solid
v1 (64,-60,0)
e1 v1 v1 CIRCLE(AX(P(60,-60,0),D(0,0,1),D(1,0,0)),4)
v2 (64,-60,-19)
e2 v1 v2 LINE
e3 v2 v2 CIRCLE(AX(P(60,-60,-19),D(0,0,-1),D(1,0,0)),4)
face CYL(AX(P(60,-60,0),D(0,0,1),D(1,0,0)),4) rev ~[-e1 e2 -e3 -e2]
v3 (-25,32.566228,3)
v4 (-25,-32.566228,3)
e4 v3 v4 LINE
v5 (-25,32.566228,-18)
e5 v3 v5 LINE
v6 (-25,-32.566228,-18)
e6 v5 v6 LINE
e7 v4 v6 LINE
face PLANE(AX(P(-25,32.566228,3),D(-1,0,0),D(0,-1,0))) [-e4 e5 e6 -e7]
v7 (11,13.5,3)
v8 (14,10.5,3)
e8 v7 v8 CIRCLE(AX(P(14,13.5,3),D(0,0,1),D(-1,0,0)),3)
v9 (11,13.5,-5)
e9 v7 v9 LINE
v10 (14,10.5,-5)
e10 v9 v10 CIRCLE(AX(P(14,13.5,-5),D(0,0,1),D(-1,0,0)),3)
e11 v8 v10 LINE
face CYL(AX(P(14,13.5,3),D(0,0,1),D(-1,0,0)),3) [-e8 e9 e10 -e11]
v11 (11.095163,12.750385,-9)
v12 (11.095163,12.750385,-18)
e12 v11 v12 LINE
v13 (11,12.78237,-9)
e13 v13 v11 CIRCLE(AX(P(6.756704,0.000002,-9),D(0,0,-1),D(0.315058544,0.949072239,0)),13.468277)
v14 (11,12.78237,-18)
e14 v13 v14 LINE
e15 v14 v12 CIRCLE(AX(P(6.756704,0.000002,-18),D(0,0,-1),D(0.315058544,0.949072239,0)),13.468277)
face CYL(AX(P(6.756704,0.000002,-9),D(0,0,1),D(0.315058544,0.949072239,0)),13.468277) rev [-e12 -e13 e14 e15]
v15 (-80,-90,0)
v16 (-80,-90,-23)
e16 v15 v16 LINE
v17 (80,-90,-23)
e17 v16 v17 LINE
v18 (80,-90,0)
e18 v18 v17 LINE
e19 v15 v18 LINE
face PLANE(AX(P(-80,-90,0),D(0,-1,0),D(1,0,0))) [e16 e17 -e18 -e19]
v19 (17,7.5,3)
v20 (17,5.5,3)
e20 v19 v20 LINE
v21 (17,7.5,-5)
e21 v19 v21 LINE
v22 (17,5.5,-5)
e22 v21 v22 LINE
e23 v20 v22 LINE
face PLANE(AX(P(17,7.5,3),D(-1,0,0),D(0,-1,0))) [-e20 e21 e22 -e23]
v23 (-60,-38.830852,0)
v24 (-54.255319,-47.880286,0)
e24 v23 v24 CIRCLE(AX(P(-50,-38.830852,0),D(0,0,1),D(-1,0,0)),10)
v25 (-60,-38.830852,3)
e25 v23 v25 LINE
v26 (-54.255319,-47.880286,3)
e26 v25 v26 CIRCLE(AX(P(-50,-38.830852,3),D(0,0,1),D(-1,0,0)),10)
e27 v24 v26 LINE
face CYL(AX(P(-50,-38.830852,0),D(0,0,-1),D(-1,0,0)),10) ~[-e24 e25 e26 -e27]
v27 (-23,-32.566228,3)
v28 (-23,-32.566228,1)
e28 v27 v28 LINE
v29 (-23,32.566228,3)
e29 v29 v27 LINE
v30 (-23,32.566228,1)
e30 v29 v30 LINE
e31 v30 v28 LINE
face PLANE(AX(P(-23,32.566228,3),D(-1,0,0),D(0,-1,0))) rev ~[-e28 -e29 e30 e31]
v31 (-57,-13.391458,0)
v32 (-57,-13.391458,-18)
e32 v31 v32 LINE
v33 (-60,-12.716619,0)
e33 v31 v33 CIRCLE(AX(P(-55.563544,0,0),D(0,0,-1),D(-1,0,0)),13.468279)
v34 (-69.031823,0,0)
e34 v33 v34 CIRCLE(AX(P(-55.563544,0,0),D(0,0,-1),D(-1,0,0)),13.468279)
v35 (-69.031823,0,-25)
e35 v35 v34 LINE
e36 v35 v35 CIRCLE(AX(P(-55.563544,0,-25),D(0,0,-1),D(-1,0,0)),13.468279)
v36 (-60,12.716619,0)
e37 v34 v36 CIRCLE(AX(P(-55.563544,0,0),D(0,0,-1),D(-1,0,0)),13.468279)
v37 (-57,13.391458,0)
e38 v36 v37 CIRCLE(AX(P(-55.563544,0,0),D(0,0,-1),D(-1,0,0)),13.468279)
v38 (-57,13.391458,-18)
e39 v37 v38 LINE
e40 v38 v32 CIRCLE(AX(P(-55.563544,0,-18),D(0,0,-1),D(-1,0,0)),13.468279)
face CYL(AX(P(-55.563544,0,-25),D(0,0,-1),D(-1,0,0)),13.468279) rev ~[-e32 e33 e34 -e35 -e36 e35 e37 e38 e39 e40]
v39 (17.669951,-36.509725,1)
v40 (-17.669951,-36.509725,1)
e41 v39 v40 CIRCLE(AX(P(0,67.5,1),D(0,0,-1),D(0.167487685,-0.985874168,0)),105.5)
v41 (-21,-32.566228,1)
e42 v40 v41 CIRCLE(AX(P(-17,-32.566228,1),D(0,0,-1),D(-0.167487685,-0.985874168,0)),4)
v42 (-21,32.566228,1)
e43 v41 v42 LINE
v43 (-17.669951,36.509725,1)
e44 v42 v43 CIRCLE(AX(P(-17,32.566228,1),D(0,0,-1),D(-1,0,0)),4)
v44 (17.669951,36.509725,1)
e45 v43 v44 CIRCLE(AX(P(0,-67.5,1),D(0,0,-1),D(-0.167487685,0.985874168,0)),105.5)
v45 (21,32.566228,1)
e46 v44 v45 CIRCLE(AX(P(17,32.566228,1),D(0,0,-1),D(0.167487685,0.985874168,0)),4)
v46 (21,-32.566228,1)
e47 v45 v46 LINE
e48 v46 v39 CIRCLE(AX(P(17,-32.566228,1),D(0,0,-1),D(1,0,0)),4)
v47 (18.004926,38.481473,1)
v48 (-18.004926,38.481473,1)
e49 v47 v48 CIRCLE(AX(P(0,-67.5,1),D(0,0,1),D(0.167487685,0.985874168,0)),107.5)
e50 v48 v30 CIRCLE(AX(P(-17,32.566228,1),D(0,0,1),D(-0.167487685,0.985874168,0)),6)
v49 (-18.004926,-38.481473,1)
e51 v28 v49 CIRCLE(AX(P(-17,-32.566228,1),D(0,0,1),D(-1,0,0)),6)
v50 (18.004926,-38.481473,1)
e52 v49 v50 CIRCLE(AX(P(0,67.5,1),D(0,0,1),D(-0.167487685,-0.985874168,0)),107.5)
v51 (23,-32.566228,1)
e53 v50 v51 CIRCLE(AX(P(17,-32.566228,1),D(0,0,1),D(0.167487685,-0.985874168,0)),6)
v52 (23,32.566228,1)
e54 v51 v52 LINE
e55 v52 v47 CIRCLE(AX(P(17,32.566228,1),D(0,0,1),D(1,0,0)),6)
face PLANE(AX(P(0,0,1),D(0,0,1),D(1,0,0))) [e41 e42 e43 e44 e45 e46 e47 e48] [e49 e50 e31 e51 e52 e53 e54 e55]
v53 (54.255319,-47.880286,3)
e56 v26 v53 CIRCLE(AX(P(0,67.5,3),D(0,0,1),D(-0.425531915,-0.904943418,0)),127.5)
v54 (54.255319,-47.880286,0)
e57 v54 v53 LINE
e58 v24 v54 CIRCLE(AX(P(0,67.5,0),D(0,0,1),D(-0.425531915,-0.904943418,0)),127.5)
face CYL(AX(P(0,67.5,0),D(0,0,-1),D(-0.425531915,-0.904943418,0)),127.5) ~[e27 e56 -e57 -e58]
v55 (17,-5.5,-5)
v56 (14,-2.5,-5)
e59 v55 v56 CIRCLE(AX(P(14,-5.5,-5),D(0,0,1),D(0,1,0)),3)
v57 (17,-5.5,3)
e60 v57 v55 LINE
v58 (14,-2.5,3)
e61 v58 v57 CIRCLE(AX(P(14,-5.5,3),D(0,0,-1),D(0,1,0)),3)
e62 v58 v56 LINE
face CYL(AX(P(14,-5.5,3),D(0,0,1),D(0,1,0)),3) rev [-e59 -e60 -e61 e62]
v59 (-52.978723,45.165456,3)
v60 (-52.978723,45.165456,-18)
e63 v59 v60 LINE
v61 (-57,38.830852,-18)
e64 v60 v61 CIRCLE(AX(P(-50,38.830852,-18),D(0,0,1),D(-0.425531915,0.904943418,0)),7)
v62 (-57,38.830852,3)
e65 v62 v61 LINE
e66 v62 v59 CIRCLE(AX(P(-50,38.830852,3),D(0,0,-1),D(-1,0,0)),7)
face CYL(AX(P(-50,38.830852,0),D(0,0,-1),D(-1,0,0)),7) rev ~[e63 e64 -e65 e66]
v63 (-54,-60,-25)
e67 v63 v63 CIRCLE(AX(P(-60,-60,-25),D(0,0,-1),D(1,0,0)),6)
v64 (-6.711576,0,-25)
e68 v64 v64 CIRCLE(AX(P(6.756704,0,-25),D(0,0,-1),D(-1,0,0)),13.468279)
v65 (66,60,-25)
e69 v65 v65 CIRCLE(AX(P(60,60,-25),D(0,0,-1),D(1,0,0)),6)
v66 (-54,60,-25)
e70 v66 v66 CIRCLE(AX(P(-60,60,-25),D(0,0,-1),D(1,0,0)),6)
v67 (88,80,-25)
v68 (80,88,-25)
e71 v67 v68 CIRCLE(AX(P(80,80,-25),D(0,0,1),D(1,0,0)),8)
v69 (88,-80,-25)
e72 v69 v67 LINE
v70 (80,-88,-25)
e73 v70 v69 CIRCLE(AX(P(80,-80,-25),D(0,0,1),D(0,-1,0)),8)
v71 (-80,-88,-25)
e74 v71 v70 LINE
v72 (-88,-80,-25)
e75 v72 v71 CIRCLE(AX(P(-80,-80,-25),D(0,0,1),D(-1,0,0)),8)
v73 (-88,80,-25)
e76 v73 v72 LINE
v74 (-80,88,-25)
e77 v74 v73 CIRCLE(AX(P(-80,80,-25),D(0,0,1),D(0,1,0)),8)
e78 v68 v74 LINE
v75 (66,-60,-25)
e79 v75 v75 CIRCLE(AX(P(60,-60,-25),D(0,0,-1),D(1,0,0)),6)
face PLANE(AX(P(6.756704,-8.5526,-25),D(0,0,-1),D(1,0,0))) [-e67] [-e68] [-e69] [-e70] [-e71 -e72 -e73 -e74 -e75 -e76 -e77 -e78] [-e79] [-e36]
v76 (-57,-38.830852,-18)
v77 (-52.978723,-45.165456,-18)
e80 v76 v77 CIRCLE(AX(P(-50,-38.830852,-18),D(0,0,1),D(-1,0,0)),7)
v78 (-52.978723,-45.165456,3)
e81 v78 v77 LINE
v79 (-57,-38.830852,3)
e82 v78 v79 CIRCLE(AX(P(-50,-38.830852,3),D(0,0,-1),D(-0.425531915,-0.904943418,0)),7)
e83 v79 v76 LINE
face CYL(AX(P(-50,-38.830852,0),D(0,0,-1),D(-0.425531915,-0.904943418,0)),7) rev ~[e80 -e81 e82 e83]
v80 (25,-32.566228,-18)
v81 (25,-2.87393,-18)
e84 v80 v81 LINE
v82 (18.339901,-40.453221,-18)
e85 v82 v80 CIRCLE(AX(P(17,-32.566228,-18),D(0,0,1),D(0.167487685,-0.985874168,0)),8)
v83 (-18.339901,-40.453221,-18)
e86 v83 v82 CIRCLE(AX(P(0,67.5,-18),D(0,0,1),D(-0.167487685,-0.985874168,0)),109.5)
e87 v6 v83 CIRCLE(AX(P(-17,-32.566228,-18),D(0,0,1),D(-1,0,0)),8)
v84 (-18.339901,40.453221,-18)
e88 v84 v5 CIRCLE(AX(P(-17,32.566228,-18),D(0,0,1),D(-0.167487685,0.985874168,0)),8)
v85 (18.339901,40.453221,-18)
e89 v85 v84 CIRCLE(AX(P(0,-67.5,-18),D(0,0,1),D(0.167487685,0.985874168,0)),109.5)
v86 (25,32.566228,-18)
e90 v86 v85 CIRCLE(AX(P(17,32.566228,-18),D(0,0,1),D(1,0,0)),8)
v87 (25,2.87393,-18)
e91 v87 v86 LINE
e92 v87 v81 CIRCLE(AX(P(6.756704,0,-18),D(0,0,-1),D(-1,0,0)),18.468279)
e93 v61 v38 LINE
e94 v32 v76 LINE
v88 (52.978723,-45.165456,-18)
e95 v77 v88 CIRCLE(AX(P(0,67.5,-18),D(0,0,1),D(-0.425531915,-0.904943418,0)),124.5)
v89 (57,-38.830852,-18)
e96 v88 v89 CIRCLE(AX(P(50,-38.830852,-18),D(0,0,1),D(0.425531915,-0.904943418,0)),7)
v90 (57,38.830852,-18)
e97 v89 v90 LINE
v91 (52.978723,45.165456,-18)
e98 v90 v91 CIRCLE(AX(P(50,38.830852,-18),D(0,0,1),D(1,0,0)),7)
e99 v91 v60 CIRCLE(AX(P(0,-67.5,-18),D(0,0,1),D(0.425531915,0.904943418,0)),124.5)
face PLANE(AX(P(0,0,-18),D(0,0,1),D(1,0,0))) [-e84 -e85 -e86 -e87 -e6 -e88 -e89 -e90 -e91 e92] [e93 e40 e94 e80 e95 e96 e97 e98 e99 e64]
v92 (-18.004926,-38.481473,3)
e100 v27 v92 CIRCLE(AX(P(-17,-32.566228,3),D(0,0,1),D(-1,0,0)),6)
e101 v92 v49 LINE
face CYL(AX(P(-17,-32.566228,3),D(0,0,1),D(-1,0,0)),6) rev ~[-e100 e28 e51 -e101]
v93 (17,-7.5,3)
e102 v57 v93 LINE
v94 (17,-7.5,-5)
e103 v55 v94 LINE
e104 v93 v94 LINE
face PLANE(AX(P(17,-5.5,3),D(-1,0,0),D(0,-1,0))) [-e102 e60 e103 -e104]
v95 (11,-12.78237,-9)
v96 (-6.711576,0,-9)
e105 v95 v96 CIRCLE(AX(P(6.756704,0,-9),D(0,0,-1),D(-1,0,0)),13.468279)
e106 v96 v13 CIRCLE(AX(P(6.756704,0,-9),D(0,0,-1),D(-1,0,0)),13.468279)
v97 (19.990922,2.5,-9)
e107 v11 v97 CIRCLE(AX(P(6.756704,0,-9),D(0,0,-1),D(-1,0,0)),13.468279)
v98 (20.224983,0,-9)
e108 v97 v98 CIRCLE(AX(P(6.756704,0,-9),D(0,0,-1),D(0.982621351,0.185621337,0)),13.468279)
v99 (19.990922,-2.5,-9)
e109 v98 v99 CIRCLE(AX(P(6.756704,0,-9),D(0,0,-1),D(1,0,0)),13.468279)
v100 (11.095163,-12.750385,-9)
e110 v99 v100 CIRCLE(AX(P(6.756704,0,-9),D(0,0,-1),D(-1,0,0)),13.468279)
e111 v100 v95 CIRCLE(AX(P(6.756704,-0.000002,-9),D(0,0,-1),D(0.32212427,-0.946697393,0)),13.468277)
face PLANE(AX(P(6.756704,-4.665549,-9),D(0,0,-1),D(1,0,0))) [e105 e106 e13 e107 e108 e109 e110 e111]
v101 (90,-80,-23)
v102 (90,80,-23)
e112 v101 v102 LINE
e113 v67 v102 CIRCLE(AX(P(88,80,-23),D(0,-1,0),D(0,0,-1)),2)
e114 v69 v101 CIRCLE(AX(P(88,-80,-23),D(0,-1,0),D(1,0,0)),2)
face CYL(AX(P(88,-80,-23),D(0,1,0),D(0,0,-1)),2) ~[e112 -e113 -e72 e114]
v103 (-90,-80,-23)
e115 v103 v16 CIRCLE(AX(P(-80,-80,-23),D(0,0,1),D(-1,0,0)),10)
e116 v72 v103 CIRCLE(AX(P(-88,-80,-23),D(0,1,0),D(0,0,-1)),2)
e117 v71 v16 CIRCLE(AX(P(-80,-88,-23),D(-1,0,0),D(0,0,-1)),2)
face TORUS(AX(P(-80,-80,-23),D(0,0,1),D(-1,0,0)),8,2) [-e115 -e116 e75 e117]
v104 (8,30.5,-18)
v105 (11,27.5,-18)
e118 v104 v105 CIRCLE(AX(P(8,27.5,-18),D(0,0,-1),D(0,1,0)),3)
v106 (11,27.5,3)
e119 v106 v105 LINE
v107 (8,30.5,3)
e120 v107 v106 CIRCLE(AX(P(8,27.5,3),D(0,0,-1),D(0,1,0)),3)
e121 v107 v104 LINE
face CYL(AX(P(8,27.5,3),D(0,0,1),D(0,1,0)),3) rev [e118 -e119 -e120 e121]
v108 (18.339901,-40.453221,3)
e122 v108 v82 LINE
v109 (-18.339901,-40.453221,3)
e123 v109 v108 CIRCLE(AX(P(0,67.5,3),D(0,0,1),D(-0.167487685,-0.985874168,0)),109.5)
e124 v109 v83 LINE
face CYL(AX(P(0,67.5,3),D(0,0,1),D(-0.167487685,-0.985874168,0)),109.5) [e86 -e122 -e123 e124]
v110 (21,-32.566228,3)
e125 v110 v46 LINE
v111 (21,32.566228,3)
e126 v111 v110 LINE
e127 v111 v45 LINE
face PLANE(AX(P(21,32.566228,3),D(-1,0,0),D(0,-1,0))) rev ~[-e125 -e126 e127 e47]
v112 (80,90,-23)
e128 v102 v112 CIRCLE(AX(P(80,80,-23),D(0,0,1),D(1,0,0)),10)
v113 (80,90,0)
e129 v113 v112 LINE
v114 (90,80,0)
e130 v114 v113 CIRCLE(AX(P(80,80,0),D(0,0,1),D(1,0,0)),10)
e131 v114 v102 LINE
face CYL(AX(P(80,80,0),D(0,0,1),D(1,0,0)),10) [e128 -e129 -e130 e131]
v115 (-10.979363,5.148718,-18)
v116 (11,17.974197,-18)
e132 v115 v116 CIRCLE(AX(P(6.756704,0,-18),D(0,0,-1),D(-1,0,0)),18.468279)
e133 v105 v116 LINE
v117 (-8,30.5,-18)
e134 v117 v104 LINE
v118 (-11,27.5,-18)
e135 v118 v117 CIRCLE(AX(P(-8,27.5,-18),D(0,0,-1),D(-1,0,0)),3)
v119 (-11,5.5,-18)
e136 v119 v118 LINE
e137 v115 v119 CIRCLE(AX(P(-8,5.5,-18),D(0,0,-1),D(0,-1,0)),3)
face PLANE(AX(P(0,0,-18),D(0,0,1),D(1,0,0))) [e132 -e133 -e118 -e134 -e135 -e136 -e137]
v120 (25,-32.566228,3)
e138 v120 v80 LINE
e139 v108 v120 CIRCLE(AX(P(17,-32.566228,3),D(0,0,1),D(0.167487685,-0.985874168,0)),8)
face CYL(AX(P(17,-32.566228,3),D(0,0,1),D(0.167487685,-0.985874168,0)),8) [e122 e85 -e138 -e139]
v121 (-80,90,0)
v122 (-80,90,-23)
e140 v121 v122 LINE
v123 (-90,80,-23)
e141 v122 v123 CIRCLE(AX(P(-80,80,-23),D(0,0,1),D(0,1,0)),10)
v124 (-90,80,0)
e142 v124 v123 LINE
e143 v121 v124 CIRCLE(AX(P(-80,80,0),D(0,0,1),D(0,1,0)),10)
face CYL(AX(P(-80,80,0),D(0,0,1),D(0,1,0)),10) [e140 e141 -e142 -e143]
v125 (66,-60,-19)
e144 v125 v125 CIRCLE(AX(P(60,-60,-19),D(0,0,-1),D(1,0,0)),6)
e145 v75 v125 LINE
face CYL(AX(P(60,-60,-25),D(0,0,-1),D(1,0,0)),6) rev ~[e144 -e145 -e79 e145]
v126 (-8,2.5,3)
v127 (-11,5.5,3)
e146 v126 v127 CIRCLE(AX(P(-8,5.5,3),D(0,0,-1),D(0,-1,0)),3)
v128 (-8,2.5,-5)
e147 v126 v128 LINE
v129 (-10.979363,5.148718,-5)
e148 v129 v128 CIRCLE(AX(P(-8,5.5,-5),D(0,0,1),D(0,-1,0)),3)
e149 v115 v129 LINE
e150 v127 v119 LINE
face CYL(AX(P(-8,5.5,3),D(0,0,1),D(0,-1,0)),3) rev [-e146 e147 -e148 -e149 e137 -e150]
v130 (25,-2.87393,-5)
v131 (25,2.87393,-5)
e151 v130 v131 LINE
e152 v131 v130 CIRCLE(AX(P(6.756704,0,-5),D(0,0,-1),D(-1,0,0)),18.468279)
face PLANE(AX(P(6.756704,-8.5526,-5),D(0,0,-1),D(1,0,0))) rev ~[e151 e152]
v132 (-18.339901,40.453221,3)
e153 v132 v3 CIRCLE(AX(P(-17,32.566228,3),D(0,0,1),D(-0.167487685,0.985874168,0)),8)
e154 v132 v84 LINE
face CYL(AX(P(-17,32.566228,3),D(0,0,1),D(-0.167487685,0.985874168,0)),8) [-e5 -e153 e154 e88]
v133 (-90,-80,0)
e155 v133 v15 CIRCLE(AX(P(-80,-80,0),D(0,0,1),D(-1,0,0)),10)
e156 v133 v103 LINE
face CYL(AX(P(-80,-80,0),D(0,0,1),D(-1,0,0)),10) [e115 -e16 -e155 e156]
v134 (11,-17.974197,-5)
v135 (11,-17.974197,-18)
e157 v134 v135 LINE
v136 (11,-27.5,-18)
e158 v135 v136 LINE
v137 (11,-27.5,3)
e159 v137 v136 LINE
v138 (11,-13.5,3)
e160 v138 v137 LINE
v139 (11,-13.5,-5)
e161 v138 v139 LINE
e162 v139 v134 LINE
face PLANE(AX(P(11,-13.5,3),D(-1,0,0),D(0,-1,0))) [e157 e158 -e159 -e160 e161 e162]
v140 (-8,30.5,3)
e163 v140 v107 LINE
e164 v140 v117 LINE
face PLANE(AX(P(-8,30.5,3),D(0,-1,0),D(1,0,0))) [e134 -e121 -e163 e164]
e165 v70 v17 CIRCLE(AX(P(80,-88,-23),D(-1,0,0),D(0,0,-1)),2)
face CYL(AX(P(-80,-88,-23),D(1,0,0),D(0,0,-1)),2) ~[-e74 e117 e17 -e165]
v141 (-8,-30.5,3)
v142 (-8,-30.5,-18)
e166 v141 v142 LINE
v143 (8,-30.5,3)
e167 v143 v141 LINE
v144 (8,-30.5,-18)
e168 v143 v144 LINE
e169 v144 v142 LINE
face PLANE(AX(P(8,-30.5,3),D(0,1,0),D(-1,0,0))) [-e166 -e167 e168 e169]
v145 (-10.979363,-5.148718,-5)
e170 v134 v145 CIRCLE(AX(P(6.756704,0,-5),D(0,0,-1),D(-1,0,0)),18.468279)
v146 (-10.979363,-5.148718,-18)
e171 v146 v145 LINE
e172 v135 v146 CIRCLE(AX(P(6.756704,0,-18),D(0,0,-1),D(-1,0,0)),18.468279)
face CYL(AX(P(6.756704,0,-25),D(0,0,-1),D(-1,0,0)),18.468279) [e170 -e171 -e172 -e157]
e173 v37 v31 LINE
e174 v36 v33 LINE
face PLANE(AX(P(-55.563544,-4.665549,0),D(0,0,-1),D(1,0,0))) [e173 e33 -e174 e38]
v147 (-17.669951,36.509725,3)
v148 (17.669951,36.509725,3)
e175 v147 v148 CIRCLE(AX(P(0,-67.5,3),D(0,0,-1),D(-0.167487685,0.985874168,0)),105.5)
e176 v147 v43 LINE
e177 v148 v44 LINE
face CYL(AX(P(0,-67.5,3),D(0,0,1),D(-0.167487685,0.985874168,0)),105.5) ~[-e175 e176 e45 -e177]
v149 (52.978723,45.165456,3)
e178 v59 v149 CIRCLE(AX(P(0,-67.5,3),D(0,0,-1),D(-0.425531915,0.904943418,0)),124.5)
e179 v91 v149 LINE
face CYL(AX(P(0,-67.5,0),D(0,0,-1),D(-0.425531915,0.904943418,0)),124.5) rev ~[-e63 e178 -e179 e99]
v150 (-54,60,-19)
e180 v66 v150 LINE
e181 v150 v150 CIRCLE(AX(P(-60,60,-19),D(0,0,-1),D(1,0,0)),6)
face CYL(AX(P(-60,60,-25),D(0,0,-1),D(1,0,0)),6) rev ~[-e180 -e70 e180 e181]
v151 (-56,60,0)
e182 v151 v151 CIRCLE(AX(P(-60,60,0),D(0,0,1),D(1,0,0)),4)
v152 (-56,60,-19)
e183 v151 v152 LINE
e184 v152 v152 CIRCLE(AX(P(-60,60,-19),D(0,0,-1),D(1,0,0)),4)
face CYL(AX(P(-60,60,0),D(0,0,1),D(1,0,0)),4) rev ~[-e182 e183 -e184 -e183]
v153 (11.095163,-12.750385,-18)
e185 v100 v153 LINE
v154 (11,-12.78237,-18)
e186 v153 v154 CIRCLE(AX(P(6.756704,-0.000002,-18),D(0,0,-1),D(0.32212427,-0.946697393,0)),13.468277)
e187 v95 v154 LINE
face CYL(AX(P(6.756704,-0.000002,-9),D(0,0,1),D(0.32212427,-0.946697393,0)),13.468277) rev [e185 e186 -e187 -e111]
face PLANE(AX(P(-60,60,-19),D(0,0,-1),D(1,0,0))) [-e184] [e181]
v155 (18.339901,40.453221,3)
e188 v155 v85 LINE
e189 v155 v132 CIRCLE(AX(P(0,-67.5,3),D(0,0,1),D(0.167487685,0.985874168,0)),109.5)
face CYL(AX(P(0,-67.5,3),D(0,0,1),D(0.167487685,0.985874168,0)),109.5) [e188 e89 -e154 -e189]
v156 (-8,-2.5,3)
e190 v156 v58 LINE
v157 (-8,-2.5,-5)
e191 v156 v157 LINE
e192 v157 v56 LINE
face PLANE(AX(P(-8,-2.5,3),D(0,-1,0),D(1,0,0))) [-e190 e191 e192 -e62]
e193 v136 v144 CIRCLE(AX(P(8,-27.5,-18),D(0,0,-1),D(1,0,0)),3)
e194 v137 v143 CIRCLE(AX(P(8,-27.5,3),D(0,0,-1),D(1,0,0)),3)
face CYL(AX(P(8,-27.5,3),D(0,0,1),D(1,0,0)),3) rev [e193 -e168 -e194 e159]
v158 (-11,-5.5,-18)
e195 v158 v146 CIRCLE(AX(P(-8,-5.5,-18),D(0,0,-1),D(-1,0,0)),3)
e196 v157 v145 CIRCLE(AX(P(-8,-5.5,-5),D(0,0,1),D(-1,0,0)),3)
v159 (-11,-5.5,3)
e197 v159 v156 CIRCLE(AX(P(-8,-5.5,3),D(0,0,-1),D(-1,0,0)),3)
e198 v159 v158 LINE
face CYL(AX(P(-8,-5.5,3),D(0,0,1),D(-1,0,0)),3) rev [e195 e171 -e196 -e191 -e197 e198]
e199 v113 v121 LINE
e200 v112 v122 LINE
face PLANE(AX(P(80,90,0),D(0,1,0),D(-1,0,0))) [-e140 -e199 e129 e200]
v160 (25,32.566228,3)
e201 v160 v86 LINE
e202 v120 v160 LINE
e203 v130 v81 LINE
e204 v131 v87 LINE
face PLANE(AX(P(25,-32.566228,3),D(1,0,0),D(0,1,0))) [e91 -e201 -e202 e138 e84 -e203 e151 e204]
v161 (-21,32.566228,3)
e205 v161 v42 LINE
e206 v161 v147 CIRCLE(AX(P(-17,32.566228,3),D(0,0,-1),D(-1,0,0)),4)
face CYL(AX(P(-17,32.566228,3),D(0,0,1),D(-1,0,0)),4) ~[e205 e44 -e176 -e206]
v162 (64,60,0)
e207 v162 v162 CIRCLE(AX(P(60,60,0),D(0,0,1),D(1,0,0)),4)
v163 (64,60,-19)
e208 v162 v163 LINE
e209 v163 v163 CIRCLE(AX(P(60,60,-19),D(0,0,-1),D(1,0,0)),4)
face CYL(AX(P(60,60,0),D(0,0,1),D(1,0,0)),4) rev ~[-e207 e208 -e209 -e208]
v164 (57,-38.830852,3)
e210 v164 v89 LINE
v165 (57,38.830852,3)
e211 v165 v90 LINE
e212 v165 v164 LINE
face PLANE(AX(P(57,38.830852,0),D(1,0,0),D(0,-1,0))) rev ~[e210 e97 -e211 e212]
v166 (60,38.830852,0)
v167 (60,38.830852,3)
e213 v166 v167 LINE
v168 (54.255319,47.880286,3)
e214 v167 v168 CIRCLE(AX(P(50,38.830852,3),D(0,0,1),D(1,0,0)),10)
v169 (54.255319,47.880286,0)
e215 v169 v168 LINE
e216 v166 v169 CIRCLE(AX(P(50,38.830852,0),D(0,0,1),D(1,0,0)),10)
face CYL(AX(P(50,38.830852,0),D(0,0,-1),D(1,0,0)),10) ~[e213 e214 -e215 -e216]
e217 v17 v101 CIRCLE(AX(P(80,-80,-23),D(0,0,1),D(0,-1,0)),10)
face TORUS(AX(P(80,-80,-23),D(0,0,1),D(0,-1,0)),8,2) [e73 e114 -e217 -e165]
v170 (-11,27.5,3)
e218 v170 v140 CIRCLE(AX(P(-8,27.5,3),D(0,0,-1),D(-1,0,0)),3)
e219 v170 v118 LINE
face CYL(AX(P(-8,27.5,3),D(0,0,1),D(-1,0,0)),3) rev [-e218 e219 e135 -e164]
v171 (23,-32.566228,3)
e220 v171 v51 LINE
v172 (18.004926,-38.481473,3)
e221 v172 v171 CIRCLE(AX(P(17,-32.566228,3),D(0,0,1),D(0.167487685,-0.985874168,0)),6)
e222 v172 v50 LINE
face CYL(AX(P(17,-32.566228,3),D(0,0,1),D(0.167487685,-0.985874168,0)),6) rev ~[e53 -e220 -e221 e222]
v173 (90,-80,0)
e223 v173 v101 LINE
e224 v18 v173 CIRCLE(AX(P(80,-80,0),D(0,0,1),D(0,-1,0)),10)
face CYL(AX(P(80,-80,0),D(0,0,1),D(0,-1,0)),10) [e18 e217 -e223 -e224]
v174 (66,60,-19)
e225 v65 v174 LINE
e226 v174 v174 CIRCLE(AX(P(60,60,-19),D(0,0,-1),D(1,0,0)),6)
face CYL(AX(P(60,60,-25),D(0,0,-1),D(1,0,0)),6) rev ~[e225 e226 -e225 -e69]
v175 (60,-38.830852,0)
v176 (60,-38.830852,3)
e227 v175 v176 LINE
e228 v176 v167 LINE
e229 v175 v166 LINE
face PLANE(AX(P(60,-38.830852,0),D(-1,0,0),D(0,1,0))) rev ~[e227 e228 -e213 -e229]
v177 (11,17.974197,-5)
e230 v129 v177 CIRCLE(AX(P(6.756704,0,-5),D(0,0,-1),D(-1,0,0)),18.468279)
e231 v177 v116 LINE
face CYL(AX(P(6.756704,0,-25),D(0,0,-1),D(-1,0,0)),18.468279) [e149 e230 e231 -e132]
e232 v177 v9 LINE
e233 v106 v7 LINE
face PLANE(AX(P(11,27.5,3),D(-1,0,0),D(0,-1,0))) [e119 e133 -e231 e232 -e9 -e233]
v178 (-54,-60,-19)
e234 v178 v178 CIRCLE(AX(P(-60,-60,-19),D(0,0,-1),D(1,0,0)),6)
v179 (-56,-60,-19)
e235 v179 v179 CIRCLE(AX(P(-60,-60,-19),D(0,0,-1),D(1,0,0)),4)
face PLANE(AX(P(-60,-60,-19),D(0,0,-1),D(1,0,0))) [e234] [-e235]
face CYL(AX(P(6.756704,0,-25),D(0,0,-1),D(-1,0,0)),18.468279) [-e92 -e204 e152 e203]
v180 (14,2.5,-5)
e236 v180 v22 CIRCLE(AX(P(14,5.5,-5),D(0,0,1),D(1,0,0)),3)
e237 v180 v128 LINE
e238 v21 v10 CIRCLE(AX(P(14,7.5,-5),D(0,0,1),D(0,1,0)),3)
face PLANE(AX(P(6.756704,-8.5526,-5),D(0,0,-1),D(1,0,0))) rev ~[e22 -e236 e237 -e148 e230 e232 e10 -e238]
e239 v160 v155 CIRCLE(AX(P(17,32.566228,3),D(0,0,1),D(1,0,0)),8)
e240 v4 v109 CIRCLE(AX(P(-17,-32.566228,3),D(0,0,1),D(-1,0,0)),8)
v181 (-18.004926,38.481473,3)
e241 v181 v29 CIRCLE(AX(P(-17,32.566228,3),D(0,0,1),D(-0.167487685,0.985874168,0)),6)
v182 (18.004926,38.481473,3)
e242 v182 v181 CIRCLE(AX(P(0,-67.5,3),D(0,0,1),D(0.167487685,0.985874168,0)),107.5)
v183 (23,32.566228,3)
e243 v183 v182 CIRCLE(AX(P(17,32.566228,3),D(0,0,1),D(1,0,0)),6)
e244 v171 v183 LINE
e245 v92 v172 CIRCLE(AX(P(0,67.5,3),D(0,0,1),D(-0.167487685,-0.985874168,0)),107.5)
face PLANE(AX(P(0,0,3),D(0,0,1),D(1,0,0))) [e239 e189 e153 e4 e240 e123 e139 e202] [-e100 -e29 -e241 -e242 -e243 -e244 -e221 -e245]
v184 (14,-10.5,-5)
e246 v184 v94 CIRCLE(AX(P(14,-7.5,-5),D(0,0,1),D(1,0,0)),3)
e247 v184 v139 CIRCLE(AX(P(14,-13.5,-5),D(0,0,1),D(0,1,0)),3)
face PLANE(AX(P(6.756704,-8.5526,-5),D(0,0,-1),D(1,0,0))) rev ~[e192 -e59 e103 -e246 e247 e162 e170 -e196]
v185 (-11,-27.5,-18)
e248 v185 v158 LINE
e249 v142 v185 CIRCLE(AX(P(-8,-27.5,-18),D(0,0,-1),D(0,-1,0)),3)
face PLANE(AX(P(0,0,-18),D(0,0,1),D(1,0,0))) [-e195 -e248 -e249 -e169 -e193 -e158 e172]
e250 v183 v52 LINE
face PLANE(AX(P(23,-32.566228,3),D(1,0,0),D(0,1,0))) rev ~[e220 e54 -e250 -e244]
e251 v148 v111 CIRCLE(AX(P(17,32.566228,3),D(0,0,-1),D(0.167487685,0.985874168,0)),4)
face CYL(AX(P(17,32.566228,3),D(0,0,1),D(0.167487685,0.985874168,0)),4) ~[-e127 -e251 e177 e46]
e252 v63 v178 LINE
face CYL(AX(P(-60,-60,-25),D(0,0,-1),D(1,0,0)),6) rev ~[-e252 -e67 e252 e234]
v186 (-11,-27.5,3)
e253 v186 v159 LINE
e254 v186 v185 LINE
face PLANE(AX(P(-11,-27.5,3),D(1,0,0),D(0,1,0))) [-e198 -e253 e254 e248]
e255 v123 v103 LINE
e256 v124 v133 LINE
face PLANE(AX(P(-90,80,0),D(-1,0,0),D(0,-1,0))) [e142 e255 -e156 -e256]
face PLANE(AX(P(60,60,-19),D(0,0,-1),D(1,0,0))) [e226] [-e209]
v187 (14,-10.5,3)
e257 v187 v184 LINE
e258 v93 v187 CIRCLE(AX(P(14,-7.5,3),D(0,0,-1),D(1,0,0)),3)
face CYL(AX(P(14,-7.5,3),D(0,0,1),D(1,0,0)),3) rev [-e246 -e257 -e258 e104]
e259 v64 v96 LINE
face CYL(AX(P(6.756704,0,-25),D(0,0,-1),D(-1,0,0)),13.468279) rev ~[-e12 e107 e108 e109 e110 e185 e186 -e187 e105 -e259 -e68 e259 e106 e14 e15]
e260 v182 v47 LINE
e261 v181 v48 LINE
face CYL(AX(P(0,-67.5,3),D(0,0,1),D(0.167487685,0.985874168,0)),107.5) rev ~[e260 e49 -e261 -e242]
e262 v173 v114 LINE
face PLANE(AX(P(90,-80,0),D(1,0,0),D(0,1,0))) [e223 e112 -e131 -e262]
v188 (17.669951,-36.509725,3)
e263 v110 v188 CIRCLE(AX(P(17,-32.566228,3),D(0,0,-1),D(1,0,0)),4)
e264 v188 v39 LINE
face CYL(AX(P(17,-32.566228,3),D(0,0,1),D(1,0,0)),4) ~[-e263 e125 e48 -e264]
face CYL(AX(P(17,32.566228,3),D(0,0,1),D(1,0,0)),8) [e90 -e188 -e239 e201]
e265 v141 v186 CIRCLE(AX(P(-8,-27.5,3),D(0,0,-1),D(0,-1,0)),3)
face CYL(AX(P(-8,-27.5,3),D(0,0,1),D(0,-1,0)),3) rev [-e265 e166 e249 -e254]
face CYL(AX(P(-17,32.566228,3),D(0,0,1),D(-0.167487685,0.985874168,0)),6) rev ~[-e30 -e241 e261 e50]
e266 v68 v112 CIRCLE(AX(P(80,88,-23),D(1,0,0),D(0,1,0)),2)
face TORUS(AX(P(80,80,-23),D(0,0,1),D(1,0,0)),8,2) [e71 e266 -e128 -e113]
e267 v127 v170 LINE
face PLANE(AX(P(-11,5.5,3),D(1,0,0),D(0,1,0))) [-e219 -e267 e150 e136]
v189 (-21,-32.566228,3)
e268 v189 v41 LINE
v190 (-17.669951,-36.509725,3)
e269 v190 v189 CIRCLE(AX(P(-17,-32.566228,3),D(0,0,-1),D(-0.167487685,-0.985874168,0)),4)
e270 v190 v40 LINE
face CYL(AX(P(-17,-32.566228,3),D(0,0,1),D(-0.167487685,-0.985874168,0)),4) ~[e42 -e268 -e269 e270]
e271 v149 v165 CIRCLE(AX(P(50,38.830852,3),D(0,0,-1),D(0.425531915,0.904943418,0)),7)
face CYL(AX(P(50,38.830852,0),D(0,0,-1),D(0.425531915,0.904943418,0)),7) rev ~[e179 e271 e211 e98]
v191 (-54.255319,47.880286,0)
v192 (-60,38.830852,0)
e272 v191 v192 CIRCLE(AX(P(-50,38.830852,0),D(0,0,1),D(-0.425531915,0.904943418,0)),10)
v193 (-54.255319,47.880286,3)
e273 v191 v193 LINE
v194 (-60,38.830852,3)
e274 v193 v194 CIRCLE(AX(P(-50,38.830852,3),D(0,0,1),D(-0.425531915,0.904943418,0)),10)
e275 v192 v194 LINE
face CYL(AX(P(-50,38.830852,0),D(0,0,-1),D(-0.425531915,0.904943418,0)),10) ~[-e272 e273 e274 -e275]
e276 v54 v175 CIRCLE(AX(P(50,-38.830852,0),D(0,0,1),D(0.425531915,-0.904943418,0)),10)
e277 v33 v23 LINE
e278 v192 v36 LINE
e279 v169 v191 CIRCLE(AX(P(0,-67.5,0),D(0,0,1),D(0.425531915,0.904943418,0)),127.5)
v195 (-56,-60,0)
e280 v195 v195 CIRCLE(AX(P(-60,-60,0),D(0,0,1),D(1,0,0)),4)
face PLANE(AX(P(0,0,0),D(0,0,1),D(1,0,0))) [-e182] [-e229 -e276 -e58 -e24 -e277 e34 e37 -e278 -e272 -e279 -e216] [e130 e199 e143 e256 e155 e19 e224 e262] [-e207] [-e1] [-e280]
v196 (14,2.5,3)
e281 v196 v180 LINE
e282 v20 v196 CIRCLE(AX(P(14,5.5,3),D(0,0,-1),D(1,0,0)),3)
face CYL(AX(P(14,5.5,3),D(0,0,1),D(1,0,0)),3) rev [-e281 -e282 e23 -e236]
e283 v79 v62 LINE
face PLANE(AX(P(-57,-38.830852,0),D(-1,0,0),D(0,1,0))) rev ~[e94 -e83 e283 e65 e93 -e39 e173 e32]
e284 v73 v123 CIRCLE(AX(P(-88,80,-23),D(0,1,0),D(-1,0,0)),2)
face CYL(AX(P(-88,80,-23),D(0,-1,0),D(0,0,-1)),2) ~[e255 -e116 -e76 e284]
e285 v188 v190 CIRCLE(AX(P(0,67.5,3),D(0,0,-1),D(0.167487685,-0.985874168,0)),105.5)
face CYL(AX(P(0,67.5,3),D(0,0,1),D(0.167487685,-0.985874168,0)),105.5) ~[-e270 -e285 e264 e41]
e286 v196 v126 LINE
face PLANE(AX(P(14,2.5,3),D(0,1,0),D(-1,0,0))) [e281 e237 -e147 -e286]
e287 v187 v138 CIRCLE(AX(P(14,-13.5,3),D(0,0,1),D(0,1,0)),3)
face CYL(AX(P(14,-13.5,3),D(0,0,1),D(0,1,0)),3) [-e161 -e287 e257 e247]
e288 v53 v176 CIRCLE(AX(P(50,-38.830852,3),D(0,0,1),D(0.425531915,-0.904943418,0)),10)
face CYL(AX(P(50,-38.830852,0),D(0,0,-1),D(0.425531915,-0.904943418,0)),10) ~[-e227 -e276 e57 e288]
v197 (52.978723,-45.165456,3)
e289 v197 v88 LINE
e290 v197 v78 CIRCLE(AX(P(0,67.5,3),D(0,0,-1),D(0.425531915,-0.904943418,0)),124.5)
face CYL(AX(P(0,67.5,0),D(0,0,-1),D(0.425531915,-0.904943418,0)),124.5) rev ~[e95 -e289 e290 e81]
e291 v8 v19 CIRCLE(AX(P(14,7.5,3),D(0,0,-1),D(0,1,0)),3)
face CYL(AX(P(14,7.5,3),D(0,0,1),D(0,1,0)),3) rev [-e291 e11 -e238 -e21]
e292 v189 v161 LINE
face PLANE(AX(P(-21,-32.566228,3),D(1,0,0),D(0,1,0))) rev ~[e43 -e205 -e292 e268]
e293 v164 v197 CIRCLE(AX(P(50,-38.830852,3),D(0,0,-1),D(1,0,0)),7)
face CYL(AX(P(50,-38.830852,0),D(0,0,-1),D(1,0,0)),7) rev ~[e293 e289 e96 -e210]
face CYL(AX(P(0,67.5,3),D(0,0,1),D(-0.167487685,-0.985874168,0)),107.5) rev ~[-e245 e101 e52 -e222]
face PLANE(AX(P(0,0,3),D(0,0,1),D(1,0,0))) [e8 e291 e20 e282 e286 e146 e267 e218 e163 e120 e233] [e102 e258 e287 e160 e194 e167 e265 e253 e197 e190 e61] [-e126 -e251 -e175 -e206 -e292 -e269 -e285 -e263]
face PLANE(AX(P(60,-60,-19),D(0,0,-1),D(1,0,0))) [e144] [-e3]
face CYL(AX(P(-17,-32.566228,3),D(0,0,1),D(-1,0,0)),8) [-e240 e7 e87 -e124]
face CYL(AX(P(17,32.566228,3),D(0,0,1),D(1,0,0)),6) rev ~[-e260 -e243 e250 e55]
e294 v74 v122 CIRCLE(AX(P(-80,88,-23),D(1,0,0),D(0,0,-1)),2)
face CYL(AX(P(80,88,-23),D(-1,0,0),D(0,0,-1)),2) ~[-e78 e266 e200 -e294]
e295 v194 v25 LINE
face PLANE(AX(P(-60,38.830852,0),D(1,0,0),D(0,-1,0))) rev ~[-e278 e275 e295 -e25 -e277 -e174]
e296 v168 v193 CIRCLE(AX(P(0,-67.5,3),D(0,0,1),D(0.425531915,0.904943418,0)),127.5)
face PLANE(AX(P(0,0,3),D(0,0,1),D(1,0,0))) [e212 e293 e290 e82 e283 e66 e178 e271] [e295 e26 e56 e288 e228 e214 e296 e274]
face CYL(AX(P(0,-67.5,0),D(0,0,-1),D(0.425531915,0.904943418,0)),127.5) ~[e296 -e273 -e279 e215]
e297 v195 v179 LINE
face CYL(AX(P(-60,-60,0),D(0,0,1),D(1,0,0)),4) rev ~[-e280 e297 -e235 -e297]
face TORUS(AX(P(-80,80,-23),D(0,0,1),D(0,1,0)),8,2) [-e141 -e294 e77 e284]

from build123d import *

# Parameters (mm, degrees)
F0_R      = 4
F1_DEPTH  = 25
F2_DEPTH  = 3
F3_DEPTH  = 18
F5_DEPTH  = 21
F6_DEPTH  = 2
F8_DEPTH  = 20
F9_DEPTH  = 16
F10_DEPTH = 25
F7_R      = 6
F7_R_2    = 4
F11_DEPTH = 6
F13_DEPTH = 9
F15_R     = 2


# Not quite as in the source:
# - a feature of the source that left no trace in its solid (it failed there, or was rolled back) is left out
# - a feature names something its author has since deleted; it is built from what else it names


with BuildPart() as f1:
    # F0 (on Top) → F1 (new body)
    with BuildSketch(Plane.XY):
        with BuildLine():
            ThreePointArc((-90, -80), (-87.0710678119, -87.0710678119), (-80, -90))
            Line((-80, -90), (80, -90))
            ThreePointArc((80, -90), (87.0710678119, -87.0710678119), (90, -80))
            Line((90, -80), (90, 80))
            ThreePointArc((90, 80), (87.0710678119, 87.0710678119), (80, 90))
            Line((80, 90), (-80, 90))
            ThreePointArc((-80, 90), (-87.0710678119, 87.0710678119), (-90, 80))
            Line((-90, 80), (-90, -80))
        make_face()
        with Locations((-60, -60)):
            Circle(F0_R, mode=Mode.SUBTRACT)
        with Locations((60, -60)):
            Circle(F0_R, mode=Mode.SUBTRACT)
        with Locations((-60, 60)):
            Circle(F0_R, mode=Mode.SUBTRACT)
        with BuildLine():
            ThreePointArc((-64, 38.8308515907), (-61.8195654598, 46.3340424013), (-55.9574468085, 51.5000594398))
            ThreePointArc((-55.9574468085, 51.5000594398), (0, 64), (55.9574468085, 51.5000594398))
            ThreePointArc((55.9574468085, 51.5000594398), (61.8195654598, 46.3340424013), (64, 38.8308515907))
            Line((64, 38.8308515907), (64, -38.8308515907))
            ThreePointArc((64, -38.8308515907), (61.8195654598, -46.3340424013), (55.9574468085, -51.5000594398))
            ThreePointArc((55.9574468085, -51.5000594398), (0, -64), (-55.9574468085, -51.5000594398))
            ThreePointArc((-55.9574468085, -51.5000594398), (-61.8195654598, -46.3340424013), (-64, -38.8308515907))
            Line((-64, -38.8308515907), (-64, 38.8308515907))
        make_face(mode=Mode.SUBTRACT)
        with Locations((60, 60)):
            Circle(F0_R, mode=Mode.SUBTRACT)
        with BuildLine():
            ThreePointArc((55.9574468085, 51.5000594398), (0, 64), (-55.9574468085, 51.5000594398))
            ThreePointArc((-55.9574468085, 51.5000594398), (-61.8195654598, 46.3340424013), (-64, 38.8308515907))
            Line((-64, 38.8308515907), (-64, -38.8308515907))
            ThreePointArc((-64, -38.8308515907), (-61.8195654598, -46.3340424013), (-55.9574468085, -51.5000594398))
            ThreePointArc((-55.9574468085, -51.5000594398), (0, -64), (55.9574468085, -51.5000594398))
            ThreePointArc((55.9574468085, -51.5000594398), (61.8195654598, -46.3340424013), (64, -38.8308515907))
            Line((64, -38.8308515907), (64, 38.8308515907))
            ThreePointArc((64, 38.8308515907), (61.8195654598, 46.3340424013), (55.9574468085, 51.5000594398))
        make_face()
        with BuildLine():
            Line((-60, -38.8308515907), (-60, 38.8308515907))
            ThreePointArc((-60, 38.8308515907), (-58.442546757, 44.1902735983), (-54.2553191489, 47.8802857686))
            ThreePointArc((-54.2553191489, 47.8802857686), (0, 60), (54.2553191489, 47.8802857686))
            ThreePointArc((54.2553191489, 47.8802857686), (58.442546757, 44.1902735983), (60, 38.8308515907))
            Line((60, 38.8308515907), (60, -38.8308515907))
            ThreePointArc((60, -38.8308515907), (58.442546757, -44.1902735983), (54.2553191489, -47.8802857686))
            ThreePointArc((54.2553191489, -47.8802857686), (0, -60), (-54.2553191489, -47.8802857686))
            ThreePointArc((-54.2553191489, -47.8802857686), (-58.442546757, -44.1902735983), (-60, -38.8308515907))
        make_face(mode=Mode.SUBTRACT)
        with BuildLine():
            ThreePointArc((-54.2553191489, 47.8802857686), (-58.442546757, 44.1902735983), (-60, 38.8308515907))
            Line((-60, 38.8308515907), (-60, -38.8308515907))
            ThreePointArc((-60, -38.8308515907), (-58.442546757, -44.1902735983), (-54.2553191489, -47.8802857686))
            ThreePointArc((-54.2553191489, -47.8802857686), (0, -60), (54.2553191489, -47.8802857686))
            ThreePointArc((54.2553191489, -47.8802857686), (58.442546757, -44.1902735983), (60, -38.8308515907))
            Line((60, -38.8308515907), (60, 38.8308515907))
            ThreePointArc((60, 38.8308515907), (58.442546757, 44.1902735983), (54.2553191489, 47.8802857686))
            ThreePointArc((54.2553191489, 47.8802857686), (0, 60), (-54.2553191489, 47.8802857686))
        make_face()
        with BuildLine():
            ThreePointArc((52.9787234043, 45.1654555152), (55.9097827299, 42.582446996), (57, 38.8308515907))
            Line((57, 38.8308515907), (57, -38.8308515907))
            ThreePointArc((57, -38.8308515907), (55.9097827299, -42.582446996), (52.9787234043, -45.1654555152))
            ThreePointArc((52.9787234043, -45.1654555152), (0, -57), (-52.9787234043, -45.1654555152))
            ThreePointArc((-52.9787234043, -45.1654555152), (-55.9097827299, -42.582446996), (-57, -38.8308515907))
            Line((-57, -38.8308515907), (-57, 38.8308515907))
            ThreePointArc((-57, 38.8308515907), (-55.9097827299, 42.582446996), (-52.9787234043, 45.1654555152))
            ThreePointArc((-52.9787234043, 45.1654555152), (0, 57), (52.9787234043, 45.1654555152))
        make_face(mode=Mode.SUBTRACT)
        with BuildLine():
            Line((57, -38.8308515907), (57, 38.8308515907))
            ThreePointArc((57, 38.8308515907), (55.9097827299, 42.582446996), (52.9787234043, 45.1654555152))
            ThreePointArc((52.9787234043, 45.1654555152), (0, 57), (-52.9787234043, 45.1654555152))
            ThreePointArc((-52.9787234043, 45.1654555152), (-55.9097827299, 42.582446996), (-57, 38.8308515907))
            Line((-57, 38.8308515907), (-57, -38.8308515907))
            ThreePointArc((-57, -38.8308515907), (-55.9097827299, -42.582446996), (-52.9787234043, -45.1654555152))
            ThreePointArc((-52.9787234043, -45.1654555152), (0, -57), (52.9787234043, -45.1654555152))
            ThreePointArc((52.9787234043, -45.1654555152), (55.9097827299, -42.582446996), (57, -38.8308515907))
        make_face()
    extrude(amount=-F1_DEPTH)

    # F0 (on Top) → F2 (join)
    with BuildSketch(Plane.XY):
        with BuildLine():
            ThreePointArc((-54.2553191489, 47.8802857686), (-58.442546757, 44.1902735983), (-60, 38.8308515907))
            Line((-60, 38.8308515907), (-60, -38.8308515907))
            ThreePointArc((-60, -38.8308515907), (-58.442546757, -44.1902735983), (-54.2553191489, -47.8802857686))
            ThreePointArc((-54.2553191489, -47.8802857686), (0, -60), (54.2553191489, -47.8802857686))
            ThreePointArc((54.2553191489, -47.8802857686), (58.442546757, -44.1902735983), (60, -38.8308515907))
            Line((60, -38.8308515907), (60, 38.8308515907))
            ThreePointArc((60, 38.8308515907), (58.442546757, 44.1902735983), (54.2553191489, 47.8802857686))
            ThreePointArc((54.2553191489, 47.8802857686), (0, 60), (-54.2553191489, 47.8802857686))
        make_face()
        with BuildLine():
            ThreePointArc((52.9787234043, 45.1654555152), (55.9097827299, 42.582446996), (57, 38.8308515907))
            Line((57, 38.8308515907), (57, -38.8308515907))
            ThreePointArc((57, -38.8308515907), (55.9097827299, -42.582446996), (52.9787234043, -45.1654555152))
            ThreePointArc((52.9787234043, -45.1654555152), (0, -57), (-52.9787234043, -45.1654555152))
            ThreePointArc((-52.9787234043, -45.1654555152), (-55.9097827299, -42.582446996), (-57, -38.8308515907))
            Line((-57, -38.8308515907), (-57, 38.8308515907))
            ThreePointArc((-57, 38.8308515907), (-55.9097827299, 42.582446996), (-52.9787234043, 45.1654555152))
            ThreePointArc((-52.9787234043, 45.1654555152), (0, 57), (52.9787234043, 45.1654555152))
        make_face(mode=Mode.SUBTRACT)
    extrude(amount=F2_DEPTH)

    # F0 (on Top) → F3 (cut)
    with BuildSketch(Plane.XY):
        with BuildLine():
            Line((57, -38.8308515907), (57, 38.8308515907))
            ThreePointArc((57, 38.8308515907), (55.9097827299, 42.582446996), (52.9787234043, 45.1654555152))
            ThreePointArc((52.9787234043, 45.1654555152), (0, 57), (-52.9787234043, 45.1654555152))
            ThreePointArc((-52.9787234043, 45.1654555152), (-55.9097827299, 42.582446996), (-57, 38.8308515907))
            Line((-57, 38.8308515907), (-57, -38.8308515907))
            ThreePointArc((-57, -38.8308515907), (-55.9097827299, -42.582446996), (-52.9787234043, -45.1654555152))
            ThreePointArc((-52.9787234043, -45.1654555152), (0, -57), (52.9787234043, -45.1654555152))
            ThreePointArc((52.9787234043, -45.1654555152), (55.9097827299, -42.582446996), (57, -38.8308515907))
        make_face()
    extrude(amount=-F3_DEPTH, mode=Mode.SUBTRACT)

    # F4 (on face) → F5 (join, through all)
    with BuildSketch(Plane.XY.offset(3)):
        with BuildLine():
            ThreePointArc((-25, -32.5662280692), (-23.1122504785, -37.7276614059), (-18.3399014778, -40.4532214146))
            ThreePointArc((-18.3399014778, -40.4532214146), (0, -42), (18.3399014778, -40.4532214146))
            ThreePointArc((18.3399014778, -40.4532214146), (23.1122504785, -37.7276614059), (25, -32.5662280692))
            Line((25, -32.5662280692), (25, 32.5662280692))
            ThreePointArc((25, 32.5662280692), (23.1122504785, 37.7276614059), (18.3399014778, 40.4532214146))
            ThreePointArc((18.3399014778, 40.4532214146), (0, 42), (-18.3399014778, 40.4532214146))
            ThreePointArc((-18.3399014778, 40.4532214146), (-23.1122504785, 37.7276614059), (-25, 32.5662280692))
            Line((-25, 32.5662280692), (-25, -32.5662280692))
        make_face()
        with BuildLine():
            ThreePointArc((18.0049261084, 38.4814730782), (21.5841878588, 36.4373030717), (23, 32.5662280692))
            Line((23, 32.5662280692), (23, -32.5662280692))
            ThreePointArc((23, -32.5662280692), (21.5841878588, -36.4373030717), (18.0049261084, -38.4814730782))
            ThreePointArc((18.0049261084, -38.4814730782), (0, -40), (-18.0049261084, -38.4814730782))
            ThreePointArc((-18.0049261084, -38.4814730782), (-21.5841878588, -36.4373030717), (-23, -32.5662280692))
            Line((-23, -32.5662280692), (-23, 32.5662280692))
            ThreePointArc((-23, 32.5662280692), (-21.5841878588, 36.4373030717), (-18.0049261084, 38.4814730782))
            ThreePointArc((-18.0049261084, 38.4814730782), (0, 40), (18.0049261084, 38.4814730782))
        make_face(mode=Mode.SUBTRACT)
        with BuildLine():
            Line((23, -32.5662280692), (23, 32.5662280692))
            ThreePointArc((23, 32.5662280692), (21.5841878588, 36.4373030717), (18.0049261084, 38.4814730782))
            ThreePointArc((18.0049261084, 38.4814730782), (0, 40), (-18.0049261084, 38.4814730782))
            ThreePointArc((-18.0049261084, 38.4814730782), (-21.5841878588, 36.4373030717), (-23, 32.5662280692))
            Line((-23, 32.5662280692), (-23, -32.5662280692))
            ThreePointArc((-23, -32.5662280692), (-21.5841878588, -36.4373030717), (-18.0049261084, -38.4814730782))
            ThreePointArc((-18.0049261084, -38.4814730782), (0, -40), (18.0049261084, -38.4814730782))
            ThreePointArc((18.0049261084, -38.4814730782), (21.5841878588, -36.4373030717), (23, -32.5662280692))
        make_face()
        with BuildLine():
            ThreePointArc((17.6699507389, 36.5097247419), (20.0561252392, 35.1469447375), (21, 32.5662280692))
            Line((21, 32.5662280692), (21, -32.5662280692))
            ThreePointArc((21, -32.5662280692), (20.0561252392, -35.1469447375), (17.6699507389, -36.5097247419))
            ThreePointArc((17.6699507389, -36.5097247419), (0, -38), (-17.6699507389, -36.5097247419))
            ThreePointArc((-17.6699507389, -36.5097247419), (-20.0561252392, -35.1469447375), (-21, -32.5662280692))
            Line((-21, -32.5662280692), (-21, 32.5662280692))
            ThreePointArc((-21, 32.5662280692), (-20.0561252392, 35.1469447375), (-17.6699507389, 36.5097247419))
            ThreePointArc((-17.6699507389, 36.5097247419), (0, 38), (17.6699507389, 36.5097247419))
        make_face(mode=Mode.SUBTRACT)
        with BuildLine():
            Line((21, -32.5662280692), (21, 32.5662280692))
            ThreePointArc((21, 32.5662280692), (20.0561252392, 35.1469447375), (17.6699507389, 36.5097247419))
            ThreePointArc((17.6699507389, 36.5097247419), (0, 38), (-17.6699507389, 36.5097247419))
            ThreePointArc((-17.6699507389, 36.5097247419), (-20.0561252392, 35.1469447375), (-21, 32.5662280692))
            Line((-21, 32.5662280692), (-21, -32.5662280692))
            ThreePointArc((-21, -32.5662280692), (-20.0561252392, -35.1469447375), (-17.6699507389, -36.5097247419))
            ThreePointArc((-17.6699507389, -36.5097247419), (0, -38), (17.6699507389, -36.5097247419))
            ThreePointArc((17.6699507389, -36.5097247419), (20.0561252392, -35.1469447375), (21, -32.5662280692))
        make_face()
        with BuildLine():
            Line((-8, -2.5), (14, -2.5))
            ThreePointArc((14, -2.5), (16.1213203436, -3.3786796564), (17, -5.5))
            Line((17, -5.5), (17, -7.5))
            ThreePointArc((17, -7.5), (16.1213203436, -9.6213203436), (14, -10.5))
            ThreePointArc((14, -10.5), (11.8786796564, -11.3786796564), (11, -13.5))
            Line((11, -13.5), (11, -27.5))
            ThreePointArc((11, -27.5), (10.1213203436, -29.6213203436), (8, -30.5))
            Line((8, -30.5), (-8, -30.5))
            ThreePointArc((-8, -30.5), (-10.1213203436, -29.6213203436), (-11, -27.5))
            Line((-11, -27.5), (-11, -5.5))
            ThreePointArc((-11, -5.5), (-10.1213203436, -3.3786796564), (-8, -2.5))
        make_face(mode=Mode.SUBTRACT)
        with BuildLine():
            ThreePointArc((-8, 2.5), (-10.1213203436, 3.3786796564), (-11, 5.5))
            Line((-11, 5.5), (-11, 27.5))
            ThreePointArc((-11, 27.5), (-10.1213203436, 29.6213203436), (-8, 30.5))
            Line((-8, 30.5), (8, 30.5))
            ThreePointArc((8, 30.5), (10.1213203436, 29.6213203436), (11, 27.5))
            Line((11, 27.5), (11, 13.5))
            ThreePointArc((11, 13.5), (11.8786796564, 11.3786796564), (14, 10.5))
            ThreePointArc((14, 10.5), (16.1213203436, 9.6213203436), (17, 7.5))
            Line((17, 7.5), (17, 5.5))
            ThreePointArc((17, 5.5), (16.1213203436, 3.3786796564), (14, 2.5))
            Line((14, 2.5), (-8, 2.5))
        make_face(mode=Mode.SUBTRACT)
    extrude(amount=-F5_DEPTH)

    # F4 (on face) → F6 (cut)
    with BuildSketch(Plane.XY.offset(3)):
        with BuildLine():
            Line((23, -32.5662280692), (23, 32.5662280692))
            ThreePointArc((23, 32.5662280692), (21.5841878588, 36.4373030717), (18.0049261084, 38.4814730782))
            ThreePointArc((18.0049261084, 38.4814730782), (0, 40), (-18.0049261084, 38.4814730782))
            ThreePointArc((-18.0049261084, 38.4814730782), (-21.5841878588, 36.4373030717), (-23, 32.5662280692))
            Line((-23, 32.5662280692), (-23, -32.5662280692))
            ThreePointArc((-23, -32.5662280692), (-21.5841878588, -36.4373030717), (-18.0049261084, -38.4814730782))
            ThreePointArc((-18.0049261084, -38.4814730782), (0, -40), (18.0049261084, -38.4814730782))
            ThreePointArc((18.0049261084, -38.4814730782), (21.5841878588, -36.4373030717), (23, -32.5662280692))
        make_face()
        with BuildLine():
            ThreePointArc((17.6699507389, 36.5097247419), (20.0561252392, 35.1469447375), (21, 32.5662280692))
            Line((21, 32.5662280692), (21, -32.5662280692))
            ThreePointArc((21, -32.5662280692), (20.0561252392, -35.1469447375), (17.6699507389, -36.5097247419))
            ThreePointArc((17.6699507389, -36.5097247419), (0, -38), (-17.6699507389, -36.5097247419))
            ThreePointArc((-17.6699507389, -36.5097247419), (-20.0561252392, -35.1469447375), (-21, -32.5662280692))
            Line((-21, -32.5662280692), (-21, 32.5662280692))
            ThreePointArc((-21, 32.5662280692), (-20.0561252392, 35.1469447375), (-17.6699507389, 36.5097247419))
            ThreePointArc((-17.6699507389, 36.5097247419), (0, 38), (17.6699507389, 36.5097247419))
        make_face(mode=Mode.SUBTRACT)
    extrude(amount=-F6_DEPTH, mode=Mode.SUBTRACT)

    # F7 (on face) → F8 (join)
    with BuildSketch(Plane(origin=(0, 0, -25), x_dir=(1, 0, 0), z_dir=(0, 0, -1))):
        with BuildLine():
            ThreePointArc((-6.71157564, 0), (6.7567035675, 13.4682792075), (20.224982775, 0))
            Line((20.224982775, 0), (25.224982775, 0))
            ThreePointArc((25.224982775, 0), (6.7567035675, 18.4682792075), (-11.71157564, 0))
            Line((-11.71157564, 0), (-6.71157564, 0))
        make_face()
        with BuildLine():
            Line((-6.71157564, 0), (20.224982775, 0))
            ThreePointArc((20.224982775, 0), (6.7567035675, 13.4682792075), (-6.71157564, 0))
        make_face()
        with BuildLine():
            ThreePointArc((-6.71157564, 0), (6.7567035675, -13.4682792075), (20.224982775, 0))
            Line((20.224982775, 0), (-6.71157564, 0))
        make_face()
        with BuildLine():
            Line((25.224982775, 0), (20.224982775, 0))
            ThreePointArc((20.224982775, 0), (6.7567035675, -13.4682792075), (-6.71157564, 0))
            Line((-6.71157564, 0), (-11.71157564, 0))
            ThreePointArc((-11.71157564, 0), (6.7567035675, -18.4682792075), (25.224982775, 0))
        make_face()
    extrude(amount=-F8_DEPTH)

    # F7 (on face) → F9 (cut)
    with BuildSketch(Plane(origin=(0, 0, -25), x_dir=(1, 0, 0), z_dir=(0, 0, -1))):
        with BuildLine():
            Line((-6.71157564, 0), (20.224982775, 0))
            ThreePointArc((20.224982775, 0), (6.7567035675, 13.4682792075), (-6.71157564, 0))
        make_face()
        with BuildLine():
            ThreePointArc((-6.71157564, 0), (6.7567035675, -13.4682792075), (20.224982775, 0))
            Line((20.224982775, 0), (-6.71157564, 0))
        make_face()
    extrude(amount=-F9_DEPTH, mode=Mode.SUBTRACT)

    # F7 (on face) → F10 (cut)
    with BuildSketch(Plane(origin=(0, 0, -25), x_dir=(1, 0, 0), z_dir=(0, 0, -1))):
        with BuildLine():
            Line((-69.0318229325, 0), (-42.0952645175, 0))
            ThreePointArc((-42.0952645175, 0), (-55.563543725, 13.4682792075), (-69.0318229325, 0))
        make_face()
        with BuildLine():
            ThreePointArc((-69.0318229325, 0), (-55.563543725, -13.4682792075), (-42.0952645175, 0))
            Line((-42.0952645175, 0), (-69.0318229325, 0))
        make_face()
    extrude(amount=-F10_DEPTH, mode=Mode.SUBTRACT)

    # F7 (on face) → F11 (cut)
    with BuildSketch(Plane(origin=(0, 0, -25), x_dir=(1, 0, 0), z_dir=(0, 0, -1))):
        with Locations((60, -60)):
            Circle(F7_R)
        with Locations((60, -60)):
            Circle(F7_R_2, mode=Mode.SUBTRACT)
        with Locations((-60, -60)):
            Circle(F7_R)
        with Locations((-60, -60)):
            Circle(F7_R_2, mode=Mode.SUBTRACT)
        with Locations((-60, 60)):
            Circle(F7_R)
        with Locations((-60, 60)):
            Circle(F7_R_2, mode=Mode.SUBTRACT)
        with Locations((60, 60)):
            Circle(F7_R)
        with Locations((60, 60)):
            Circle(F7_R_2, mode=Mode.SUBTRACT)
    extrude(amount=-F11_DEPTH, mode=Mode.SUBTRACT)

    # F12 (on face) → F13 (cut, through all)
    with BuildSketch(Plane(origin=(0, 0, -9), x_dir=(1, 0, 0), z_dir=(0, 0, -1))):
        with BuildLine():
            ThreePointArc((20.224982775, 0), (20.1663399806, 1.2554664788), (19.9909222755, 2.5))
            Line((19.9909222755, 2.5), (14, 2.5))
            ThreePointArc((14, 2.5), (16.1213203436, 3.3786796564), (17, 5.5))
            Line((17, 5.5), (17, 7.5))
            ThreePointArc((17, 7.5), (16.1213203436, 9.6213203436), (14, 10.5))
            ThreePointArc((14, 10.5), (12.1627255951, 11.1284134507), (11.0951631559, 12.750384826))
            ThreePointArc((11.0951631559, 12.750384826), (11.0476113807, 12.7664660322), (11, 12.7823698976))
            Line((11, 12.7823698976), (11, -12.7823698976))
            ThreePointArc((11, -12.7823698976), (11.0476113807, -12.7664660322), (11.0951631559, -12.750384826))
            ThreePointArc((11.0951631559, -12.750384826), (12.1627255951, -11.1284134507), (14, -10.5))
            ThreePointArc((14, -10.5), (16.1213203436, -9.6213203436), (17, -7.5))
            Line((17, -7.5), (17, -5.5))
            ThreePointArc((17, -5.5), (16.1213203436, -3.3786796564), (14, -2.5))
            Line((14, -2.5), (19.9909222755, -2.5))
            ThreePointArc((19.9909222755, -2.5), (20.1663399806, -1.2554664788), (20.224982775, 0))
        make_face()
    extrude(amount=F13_DEPTH, mode=Mode.SUBTRACT)

    # F15
    f15_edges = [f1.edges().sort_by_distance(p)[0] for p in [
        (0, -90, -25),
        (-87.071068, -87.071068, -25),
        (-90, 0, -25),
        (-87.071068, 87.071068, -25),
        (87.071068, -87.071068, -25),
        (0, 90, -25),
        (90, 0, -25),
        (87.071068, 87.071068, -25),
    ]]
    fillet(f15_edges, radius=F15_R)


solid = f1.part
